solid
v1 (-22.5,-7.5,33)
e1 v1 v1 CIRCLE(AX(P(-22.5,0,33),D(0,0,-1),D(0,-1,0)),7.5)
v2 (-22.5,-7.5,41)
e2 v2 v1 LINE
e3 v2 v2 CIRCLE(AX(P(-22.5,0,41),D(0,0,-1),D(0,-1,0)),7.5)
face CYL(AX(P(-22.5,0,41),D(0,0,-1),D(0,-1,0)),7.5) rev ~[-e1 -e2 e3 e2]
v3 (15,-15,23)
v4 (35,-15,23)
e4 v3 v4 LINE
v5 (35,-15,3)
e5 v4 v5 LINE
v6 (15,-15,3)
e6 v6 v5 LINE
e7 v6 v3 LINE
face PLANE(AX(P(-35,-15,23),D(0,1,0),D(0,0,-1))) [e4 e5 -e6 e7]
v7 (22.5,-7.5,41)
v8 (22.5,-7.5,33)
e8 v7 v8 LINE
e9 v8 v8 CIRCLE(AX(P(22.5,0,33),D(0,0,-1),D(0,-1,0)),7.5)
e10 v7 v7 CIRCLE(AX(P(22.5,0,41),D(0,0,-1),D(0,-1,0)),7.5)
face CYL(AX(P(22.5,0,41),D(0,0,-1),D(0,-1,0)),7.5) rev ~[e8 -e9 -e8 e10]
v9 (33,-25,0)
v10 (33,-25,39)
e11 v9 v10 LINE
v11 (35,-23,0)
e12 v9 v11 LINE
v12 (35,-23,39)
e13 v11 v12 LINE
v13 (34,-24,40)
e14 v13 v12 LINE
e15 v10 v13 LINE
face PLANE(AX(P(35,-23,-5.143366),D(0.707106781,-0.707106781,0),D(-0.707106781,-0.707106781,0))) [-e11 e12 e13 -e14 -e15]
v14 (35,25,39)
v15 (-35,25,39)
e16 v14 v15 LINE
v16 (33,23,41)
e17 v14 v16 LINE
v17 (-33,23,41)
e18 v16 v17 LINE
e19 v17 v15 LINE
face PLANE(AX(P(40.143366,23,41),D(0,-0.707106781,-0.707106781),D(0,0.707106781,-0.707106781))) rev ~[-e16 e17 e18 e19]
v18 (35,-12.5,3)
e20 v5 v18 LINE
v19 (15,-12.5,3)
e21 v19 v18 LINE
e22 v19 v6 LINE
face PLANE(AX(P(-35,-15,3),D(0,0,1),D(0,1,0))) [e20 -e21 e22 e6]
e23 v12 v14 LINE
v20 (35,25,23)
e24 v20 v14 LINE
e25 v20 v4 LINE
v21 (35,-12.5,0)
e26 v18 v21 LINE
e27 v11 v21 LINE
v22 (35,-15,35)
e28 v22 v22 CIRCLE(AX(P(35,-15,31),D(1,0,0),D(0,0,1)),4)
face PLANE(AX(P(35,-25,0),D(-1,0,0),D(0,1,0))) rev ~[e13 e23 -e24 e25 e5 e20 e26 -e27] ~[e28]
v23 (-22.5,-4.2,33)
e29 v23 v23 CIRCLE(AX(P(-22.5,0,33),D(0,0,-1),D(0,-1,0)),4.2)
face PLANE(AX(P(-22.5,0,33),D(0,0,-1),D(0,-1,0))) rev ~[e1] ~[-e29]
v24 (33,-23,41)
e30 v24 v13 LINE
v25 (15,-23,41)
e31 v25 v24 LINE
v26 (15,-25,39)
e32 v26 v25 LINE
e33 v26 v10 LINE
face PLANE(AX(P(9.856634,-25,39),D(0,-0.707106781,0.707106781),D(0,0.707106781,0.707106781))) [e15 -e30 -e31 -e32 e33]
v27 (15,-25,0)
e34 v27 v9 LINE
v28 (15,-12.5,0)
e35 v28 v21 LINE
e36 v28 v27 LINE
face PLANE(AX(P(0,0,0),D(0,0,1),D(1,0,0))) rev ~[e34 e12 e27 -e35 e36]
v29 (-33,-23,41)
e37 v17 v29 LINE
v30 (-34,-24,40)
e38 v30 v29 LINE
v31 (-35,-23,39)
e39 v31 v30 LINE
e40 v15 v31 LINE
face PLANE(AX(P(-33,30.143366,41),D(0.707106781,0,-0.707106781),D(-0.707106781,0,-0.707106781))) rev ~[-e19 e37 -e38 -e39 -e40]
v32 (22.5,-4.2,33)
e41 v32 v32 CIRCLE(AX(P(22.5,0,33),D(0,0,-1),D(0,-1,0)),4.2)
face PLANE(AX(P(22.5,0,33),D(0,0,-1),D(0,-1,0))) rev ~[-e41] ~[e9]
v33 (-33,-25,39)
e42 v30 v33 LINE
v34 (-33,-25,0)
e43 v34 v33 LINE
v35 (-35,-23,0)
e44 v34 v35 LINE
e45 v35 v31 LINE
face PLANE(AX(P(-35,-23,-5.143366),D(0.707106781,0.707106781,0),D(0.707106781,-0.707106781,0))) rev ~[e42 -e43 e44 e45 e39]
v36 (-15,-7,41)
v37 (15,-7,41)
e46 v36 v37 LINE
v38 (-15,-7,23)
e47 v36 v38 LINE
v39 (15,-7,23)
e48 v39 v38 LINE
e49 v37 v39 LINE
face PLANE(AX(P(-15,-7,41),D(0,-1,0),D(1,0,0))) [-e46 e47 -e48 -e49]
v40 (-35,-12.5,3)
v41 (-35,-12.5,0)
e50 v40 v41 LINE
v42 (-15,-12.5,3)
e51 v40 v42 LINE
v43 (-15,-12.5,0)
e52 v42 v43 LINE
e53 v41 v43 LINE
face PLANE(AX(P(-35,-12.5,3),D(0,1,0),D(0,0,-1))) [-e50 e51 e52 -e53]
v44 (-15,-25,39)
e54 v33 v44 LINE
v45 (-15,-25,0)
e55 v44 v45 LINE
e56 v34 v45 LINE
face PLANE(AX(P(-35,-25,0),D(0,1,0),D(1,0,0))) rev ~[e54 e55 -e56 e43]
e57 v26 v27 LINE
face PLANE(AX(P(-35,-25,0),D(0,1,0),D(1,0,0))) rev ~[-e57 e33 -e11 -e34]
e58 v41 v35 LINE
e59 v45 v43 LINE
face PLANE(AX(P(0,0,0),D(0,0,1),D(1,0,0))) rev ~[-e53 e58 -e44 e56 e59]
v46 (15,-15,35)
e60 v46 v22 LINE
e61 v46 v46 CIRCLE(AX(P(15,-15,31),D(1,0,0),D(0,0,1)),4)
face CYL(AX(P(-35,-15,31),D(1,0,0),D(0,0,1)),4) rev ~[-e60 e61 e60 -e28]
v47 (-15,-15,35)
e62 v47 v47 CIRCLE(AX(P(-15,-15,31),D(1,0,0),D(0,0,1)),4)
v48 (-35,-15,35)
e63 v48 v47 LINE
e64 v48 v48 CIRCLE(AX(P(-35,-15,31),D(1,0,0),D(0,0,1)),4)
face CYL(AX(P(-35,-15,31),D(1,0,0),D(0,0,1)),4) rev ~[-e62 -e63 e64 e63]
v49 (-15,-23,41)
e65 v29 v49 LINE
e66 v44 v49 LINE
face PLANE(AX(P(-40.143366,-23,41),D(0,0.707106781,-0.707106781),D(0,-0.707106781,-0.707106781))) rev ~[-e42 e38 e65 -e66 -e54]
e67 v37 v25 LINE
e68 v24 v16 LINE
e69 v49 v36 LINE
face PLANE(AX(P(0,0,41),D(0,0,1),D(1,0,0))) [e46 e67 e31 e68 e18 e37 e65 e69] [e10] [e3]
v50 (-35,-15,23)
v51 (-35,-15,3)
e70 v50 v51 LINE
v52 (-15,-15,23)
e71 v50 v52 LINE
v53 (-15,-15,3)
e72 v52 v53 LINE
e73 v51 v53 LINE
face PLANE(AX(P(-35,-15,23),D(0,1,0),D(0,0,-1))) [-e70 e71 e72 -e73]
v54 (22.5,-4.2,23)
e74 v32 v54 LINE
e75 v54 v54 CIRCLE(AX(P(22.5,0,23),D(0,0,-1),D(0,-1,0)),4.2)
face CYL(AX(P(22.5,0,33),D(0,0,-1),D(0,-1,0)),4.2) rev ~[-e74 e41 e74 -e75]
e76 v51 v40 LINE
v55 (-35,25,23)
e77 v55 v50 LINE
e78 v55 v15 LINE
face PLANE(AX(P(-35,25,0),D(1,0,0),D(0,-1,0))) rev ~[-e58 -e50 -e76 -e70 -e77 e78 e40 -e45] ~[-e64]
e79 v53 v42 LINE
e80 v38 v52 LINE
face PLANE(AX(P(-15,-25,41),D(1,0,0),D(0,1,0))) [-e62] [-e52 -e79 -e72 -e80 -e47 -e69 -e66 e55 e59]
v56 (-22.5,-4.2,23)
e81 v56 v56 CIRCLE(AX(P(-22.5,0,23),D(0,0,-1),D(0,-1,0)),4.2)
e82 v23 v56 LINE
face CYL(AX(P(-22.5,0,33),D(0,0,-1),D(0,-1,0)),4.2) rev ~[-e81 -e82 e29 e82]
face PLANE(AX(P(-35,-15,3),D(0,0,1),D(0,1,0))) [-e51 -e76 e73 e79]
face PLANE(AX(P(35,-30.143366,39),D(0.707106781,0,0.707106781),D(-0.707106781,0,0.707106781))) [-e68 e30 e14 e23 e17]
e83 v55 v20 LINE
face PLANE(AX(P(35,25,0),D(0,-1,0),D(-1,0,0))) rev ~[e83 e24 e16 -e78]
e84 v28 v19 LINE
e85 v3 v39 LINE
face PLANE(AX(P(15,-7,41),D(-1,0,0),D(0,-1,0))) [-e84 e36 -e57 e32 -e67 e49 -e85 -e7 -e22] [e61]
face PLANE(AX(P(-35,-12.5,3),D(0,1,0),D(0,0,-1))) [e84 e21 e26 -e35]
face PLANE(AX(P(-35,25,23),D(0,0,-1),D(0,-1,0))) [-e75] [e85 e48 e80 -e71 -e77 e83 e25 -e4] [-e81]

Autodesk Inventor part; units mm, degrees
ref_plane "YZ Plane" through (0, 0, 0) normal (1, 0, 0) x (0, 1, 0)
ref_plane "XZ Plane" through (0, 0, 0) normal (0, 1, 0) x (-1, 0, 0)
ref_plane "XY Plane" through (0, 0, 0) normal (0, 0, 1) x (1, 0, 0)
sketch "Sketch1" plane through (0, 0, 0) normal (0, 0, 1) x (1, 0, 0)
  line L0 (35, 25) -> (-35, 25)
  line L1 (-35, 25) -> (-35, -25)
  line L2 (-35, -25) -> (35, -25)
  line L3 (35, -25) -> (35, 25)
  line L4 (35, 25) -> (-35, -25) construction
  line L5 (-35, 25) -> (35, -25) construction
  point P0 (0, 0)
  dimension "d0" = 70
  dimension "d1" = 50
extrude "Extrusion1" add sketch "Sketch1" along normal blind 41
sketch "Sketch2" plane through (-35, -25, 0) normal (-1, 0, 0) x (0, 0, 1)
  line L0 (0, 50) -> (23, 50)
  line L1 (0, 50) -> (41, 50) projected
  line L2 (23, 50) -> (23, 10)
  line L3 (23, 10) -> (3, 10)
  line L4 (3, 10) -> (3, 12.5)
  line L5 (3, 12.5) -> (0, 12.5)
  line L6 (0, 0) -> (41, 0) projected
  line L7 (0, 50) -> (0, 12.5)
  point P0 (0, 25)
  dimension "d4" = 23
  dimension "d5" = 40
  dimension "d6" = 20
  dimension "d7" = 12.5
extrude "Extrusion2" cut sketch "Sketch2" against normal through all
sketch "Sketch3" plane through (0, 0, 41) normal (0, 0, 1) x (1, 0, 0)
  line L0 (-15, -7) -> (15, -7)
  line L1 (15, -7) -> (15, -25)
  line L2 (15, -25) -> (-15, -25)
  line L3 (-15, -25) -> (-15, -7)
  line L4 (-35, -25) -> (35, -25) projected
  point P0 (0, 0)
  dimension "d10" = 30
  dimension "d11" = 18
  dimension "d12" = 15
  dimension "d13" = 0
extrude "Extrusion3" cut sketch "Sketch3" against normal through all
sketch "Sketch4" plane through (0, 0, 41) normal (0, 0, 1) x (1, 0, 0)
  line L0 (35, 25) -> (-35, 25) projected
  point P0 (0, 0)
  point P1 (-22.5, 0)
  point P2 (22.5, 0)
  dimension "d16" = 25
  dimension "d17" = 22.5
  dimension "d18" = 45
  dimension "d19" = 25
hole "Hole1" at (-22.5, 0, 41) at (22.5, 0, 41) direction (0, 0, -1) diameter 8.4 end through all counterbore diameter 15 counterbore depth 8
sketch "Sketch5" plane through (-35, -25, 41) normal (-1, 0, 0) x (0, 0, 1)
  line L0 (0, 50) -> (0, 0) projected
  line L1 (-41, 0) -> (0, 0) projected
  point P0 (-41, 25)
  point P1 (-10, 10)
  dimension "d27" = 10
  dimension "d28" = 10
hole "Hole2" at (-35, -15, 31) direction (1, 0, 0) diameter 8 end through all
chamfer "Chamfer1" distance 2 angle 45 7 edges at (-35, 0, 41) (-25, -25, 41) (0, 25, 41) (35, 0, 41) (25, -25, 41) (-35, -25, 20.5) (35, -25, 20.5)
properties part number "Lager" material "Iron, Cast"
